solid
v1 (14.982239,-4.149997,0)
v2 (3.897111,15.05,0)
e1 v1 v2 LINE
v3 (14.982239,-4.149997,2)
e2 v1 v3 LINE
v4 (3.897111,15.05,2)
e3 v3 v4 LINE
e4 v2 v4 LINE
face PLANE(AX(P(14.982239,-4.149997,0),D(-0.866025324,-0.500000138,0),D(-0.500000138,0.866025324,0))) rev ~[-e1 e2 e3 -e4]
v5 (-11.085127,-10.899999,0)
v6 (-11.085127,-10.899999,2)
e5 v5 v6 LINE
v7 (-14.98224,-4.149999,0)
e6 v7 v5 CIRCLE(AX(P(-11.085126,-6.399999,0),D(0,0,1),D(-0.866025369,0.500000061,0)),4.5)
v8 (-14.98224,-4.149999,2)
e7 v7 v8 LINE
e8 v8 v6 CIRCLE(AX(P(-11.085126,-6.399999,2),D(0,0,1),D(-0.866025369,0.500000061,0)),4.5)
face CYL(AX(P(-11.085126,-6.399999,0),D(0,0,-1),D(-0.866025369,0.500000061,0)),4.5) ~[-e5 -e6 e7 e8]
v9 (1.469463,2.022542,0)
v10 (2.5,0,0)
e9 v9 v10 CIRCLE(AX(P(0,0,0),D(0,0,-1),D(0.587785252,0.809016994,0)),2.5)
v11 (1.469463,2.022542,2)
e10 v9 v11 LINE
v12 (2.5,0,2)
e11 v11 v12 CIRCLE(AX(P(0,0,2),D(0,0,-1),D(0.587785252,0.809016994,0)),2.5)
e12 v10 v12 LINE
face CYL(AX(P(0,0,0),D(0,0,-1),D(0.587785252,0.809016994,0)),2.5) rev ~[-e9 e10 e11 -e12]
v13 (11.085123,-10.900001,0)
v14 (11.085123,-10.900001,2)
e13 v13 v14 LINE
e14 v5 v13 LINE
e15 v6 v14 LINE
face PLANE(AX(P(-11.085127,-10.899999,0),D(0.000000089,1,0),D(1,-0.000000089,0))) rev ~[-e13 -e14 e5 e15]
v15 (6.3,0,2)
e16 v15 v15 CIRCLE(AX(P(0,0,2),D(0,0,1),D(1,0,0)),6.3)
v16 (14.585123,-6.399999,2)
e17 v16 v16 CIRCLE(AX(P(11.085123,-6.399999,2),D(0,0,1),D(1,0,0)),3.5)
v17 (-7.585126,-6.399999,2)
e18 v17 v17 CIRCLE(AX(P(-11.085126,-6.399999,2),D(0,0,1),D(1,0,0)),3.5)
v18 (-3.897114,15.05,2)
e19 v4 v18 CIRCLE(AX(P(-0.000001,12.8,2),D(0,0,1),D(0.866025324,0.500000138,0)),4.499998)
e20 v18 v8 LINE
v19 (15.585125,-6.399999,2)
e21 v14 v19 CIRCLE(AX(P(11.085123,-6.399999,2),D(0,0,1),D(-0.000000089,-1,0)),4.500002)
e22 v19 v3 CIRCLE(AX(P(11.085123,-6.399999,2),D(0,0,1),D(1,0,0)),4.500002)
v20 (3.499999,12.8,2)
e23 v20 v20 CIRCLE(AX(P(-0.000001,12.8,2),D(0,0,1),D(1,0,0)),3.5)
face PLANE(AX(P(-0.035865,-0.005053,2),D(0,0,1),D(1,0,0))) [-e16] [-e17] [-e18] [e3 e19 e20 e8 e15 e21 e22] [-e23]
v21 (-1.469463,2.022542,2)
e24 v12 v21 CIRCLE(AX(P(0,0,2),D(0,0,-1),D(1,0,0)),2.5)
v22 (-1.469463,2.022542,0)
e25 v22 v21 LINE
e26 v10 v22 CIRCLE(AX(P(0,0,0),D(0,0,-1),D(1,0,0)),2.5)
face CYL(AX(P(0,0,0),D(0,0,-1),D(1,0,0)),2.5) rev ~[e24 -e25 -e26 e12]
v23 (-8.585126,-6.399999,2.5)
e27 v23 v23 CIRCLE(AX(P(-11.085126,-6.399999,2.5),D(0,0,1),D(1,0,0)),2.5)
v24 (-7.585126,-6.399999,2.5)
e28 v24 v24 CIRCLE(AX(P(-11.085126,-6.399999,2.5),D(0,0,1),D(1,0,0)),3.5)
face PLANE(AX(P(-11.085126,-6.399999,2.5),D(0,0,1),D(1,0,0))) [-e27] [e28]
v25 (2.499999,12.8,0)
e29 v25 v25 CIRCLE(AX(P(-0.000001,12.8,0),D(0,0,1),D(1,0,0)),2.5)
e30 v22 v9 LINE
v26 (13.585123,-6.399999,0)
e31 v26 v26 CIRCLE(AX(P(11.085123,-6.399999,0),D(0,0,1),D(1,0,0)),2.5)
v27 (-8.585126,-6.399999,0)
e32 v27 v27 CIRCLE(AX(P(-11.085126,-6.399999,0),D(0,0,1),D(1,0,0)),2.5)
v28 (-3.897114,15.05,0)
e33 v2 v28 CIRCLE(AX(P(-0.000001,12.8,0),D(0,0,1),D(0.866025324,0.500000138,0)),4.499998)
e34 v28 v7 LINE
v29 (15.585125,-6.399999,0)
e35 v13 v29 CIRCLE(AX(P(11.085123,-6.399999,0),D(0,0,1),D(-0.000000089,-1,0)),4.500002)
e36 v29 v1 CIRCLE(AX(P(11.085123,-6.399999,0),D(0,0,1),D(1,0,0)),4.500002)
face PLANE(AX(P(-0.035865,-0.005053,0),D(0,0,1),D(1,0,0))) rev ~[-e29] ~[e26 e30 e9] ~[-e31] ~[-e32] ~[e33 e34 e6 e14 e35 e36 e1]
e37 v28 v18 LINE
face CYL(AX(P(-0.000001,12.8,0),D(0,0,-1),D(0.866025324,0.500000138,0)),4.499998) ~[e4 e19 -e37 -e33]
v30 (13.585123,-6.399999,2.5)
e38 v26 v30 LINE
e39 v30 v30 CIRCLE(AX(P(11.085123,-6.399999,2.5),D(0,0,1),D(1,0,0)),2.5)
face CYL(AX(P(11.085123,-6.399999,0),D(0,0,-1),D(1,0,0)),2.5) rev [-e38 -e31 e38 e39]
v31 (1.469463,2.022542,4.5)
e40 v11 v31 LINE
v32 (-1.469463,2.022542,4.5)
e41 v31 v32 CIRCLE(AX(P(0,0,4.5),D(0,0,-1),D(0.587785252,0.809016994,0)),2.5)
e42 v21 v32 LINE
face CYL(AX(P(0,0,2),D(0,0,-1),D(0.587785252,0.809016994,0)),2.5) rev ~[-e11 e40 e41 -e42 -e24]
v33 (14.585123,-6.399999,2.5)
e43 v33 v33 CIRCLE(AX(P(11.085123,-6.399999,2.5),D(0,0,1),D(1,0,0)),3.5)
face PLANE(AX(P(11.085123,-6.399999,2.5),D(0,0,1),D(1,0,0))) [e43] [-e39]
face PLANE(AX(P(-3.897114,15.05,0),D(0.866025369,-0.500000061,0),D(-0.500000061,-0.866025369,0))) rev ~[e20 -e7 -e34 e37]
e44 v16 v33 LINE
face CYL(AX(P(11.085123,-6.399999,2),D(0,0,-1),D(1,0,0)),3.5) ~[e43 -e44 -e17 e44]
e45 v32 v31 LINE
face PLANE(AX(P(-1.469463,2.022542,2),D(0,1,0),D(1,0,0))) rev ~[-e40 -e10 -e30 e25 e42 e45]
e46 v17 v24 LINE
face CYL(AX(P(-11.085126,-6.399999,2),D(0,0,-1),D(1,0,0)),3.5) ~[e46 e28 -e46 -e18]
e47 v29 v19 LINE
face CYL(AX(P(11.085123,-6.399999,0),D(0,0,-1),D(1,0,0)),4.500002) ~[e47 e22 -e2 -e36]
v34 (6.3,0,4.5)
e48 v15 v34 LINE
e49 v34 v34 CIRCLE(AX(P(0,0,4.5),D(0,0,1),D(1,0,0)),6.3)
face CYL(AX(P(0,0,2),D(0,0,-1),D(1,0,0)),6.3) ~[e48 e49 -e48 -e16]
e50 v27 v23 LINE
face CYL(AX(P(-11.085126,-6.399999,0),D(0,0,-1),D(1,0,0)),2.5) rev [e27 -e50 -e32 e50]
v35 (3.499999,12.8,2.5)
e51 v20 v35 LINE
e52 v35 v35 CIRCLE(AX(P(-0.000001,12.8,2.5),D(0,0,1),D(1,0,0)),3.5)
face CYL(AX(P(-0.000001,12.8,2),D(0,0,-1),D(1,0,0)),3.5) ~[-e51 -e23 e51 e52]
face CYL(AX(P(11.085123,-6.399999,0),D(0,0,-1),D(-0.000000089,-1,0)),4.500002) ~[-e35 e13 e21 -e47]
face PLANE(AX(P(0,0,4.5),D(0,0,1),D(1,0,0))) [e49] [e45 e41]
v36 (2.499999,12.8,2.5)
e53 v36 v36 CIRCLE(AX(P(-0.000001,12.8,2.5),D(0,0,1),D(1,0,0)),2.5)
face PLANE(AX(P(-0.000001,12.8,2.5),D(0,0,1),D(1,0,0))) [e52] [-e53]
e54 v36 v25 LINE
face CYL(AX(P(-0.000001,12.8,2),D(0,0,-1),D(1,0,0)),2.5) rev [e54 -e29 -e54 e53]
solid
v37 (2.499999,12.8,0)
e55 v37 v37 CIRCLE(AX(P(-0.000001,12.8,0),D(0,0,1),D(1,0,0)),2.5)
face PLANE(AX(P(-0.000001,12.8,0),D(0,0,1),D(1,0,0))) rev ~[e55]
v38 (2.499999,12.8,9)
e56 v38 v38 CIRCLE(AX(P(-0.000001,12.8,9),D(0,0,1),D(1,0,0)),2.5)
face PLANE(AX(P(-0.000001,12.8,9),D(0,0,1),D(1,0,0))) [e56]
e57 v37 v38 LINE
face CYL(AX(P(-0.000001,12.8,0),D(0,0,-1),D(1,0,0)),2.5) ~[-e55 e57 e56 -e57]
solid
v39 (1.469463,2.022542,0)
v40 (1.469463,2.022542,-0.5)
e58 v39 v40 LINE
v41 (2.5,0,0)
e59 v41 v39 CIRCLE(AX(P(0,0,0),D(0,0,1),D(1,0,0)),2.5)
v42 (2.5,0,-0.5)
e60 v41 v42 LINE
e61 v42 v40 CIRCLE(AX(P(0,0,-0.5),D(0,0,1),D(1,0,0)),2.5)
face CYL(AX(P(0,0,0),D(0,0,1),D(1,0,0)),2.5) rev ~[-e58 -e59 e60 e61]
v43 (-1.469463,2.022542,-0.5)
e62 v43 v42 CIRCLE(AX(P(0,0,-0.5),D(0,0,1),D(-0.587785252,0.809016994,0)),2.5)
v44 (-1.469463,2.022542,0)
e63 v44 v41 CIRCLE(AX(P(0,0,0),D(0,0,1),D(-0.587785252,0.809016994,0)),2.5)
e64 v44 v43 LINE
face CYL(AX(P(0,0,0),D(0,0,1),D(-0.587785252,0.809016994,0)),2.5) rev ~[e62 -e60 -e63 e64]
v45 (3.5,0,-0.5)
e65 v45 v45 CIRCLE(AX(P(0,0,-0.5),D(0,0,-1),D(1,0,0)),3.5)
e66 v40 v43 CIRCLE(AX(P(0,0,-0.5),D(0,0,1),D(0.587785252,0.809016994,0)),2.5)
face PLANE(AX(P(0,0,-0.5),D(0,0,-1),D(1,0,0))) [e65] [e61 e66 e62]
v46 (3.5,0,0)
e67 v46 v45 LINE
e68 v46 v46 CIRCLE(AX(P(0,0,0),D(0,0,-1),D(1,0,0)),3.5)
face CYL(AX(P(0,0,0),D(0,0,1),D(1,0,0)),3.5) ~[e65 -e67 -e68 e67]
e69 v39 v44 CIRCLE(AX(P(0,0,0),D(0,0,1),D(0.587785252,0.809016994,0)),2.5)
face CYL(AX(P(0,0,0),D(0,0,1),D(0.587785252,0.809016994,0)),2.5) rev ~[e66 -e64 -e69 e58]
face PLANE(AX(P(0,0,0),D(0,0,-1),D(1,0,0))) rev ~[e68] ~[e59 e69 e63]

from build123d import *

# Parameters (mm, degrees)
F0_R     = 6.3000004034
F0_R_2   = 2.5
F1_DEPTH = 2
F2_R     = 6.3000004034
F3_DEPTH = 2.5
F4_R     = 3.5
F5_DEPTH = 0.5
F2_R_2   = 3.5
F2_R_3   = 2.5
F6_DEPTH = 0.5
F7_DEPTH = 9


# Not quite as in the source:
# - a feature names something its author has since deleted; it is built from what else it names


with BuildPart() as f1:
    # F0 (on Top) → F1 (new body)
    with BuildSketch(Plane.XY):
        with BuildLine():
            ThreePointArc((-14.9822403618, -4.1499987392), (-9.9204403472, -2.0533328369), (-6.5851262035, -6.3999990141))
            ThreePointArc((-6.5851262035, -6.3999990141), (-7.9031458296, -9.581979671), (-11.0851266037, -10.8999990141))
            Line((-11.0851266037, -10.8999990141), (11.0851230607, -10.9000009859))
            ThreePointArc((11.0851230607, -10.9000009859), (7.1880073569, -4.1499981658), (14.9822391266, -4.1499974067))
            Line((14.9822391266, -4.1499974067), (3.8971112321, 15.0500002429))
            ThreePointArc((3.8971112321, 15.0500002429), (4.3466632431, 13.9646860482), (4.4999970644, 12.8000004034))
            ThreePointArc((4.4999970644, 12.8000004034), (-1.1646868227, 8.4533357372), (-3.8971141748, 15.0499998963))
            Line((-3.8971141748, 15.0499998963), (-14.9822403618, -4.1499987392))
        make_face()
        Circle(F0_R, mode=Mode.SUBTRACT)
        Circle(F0_R)
        with BuildLine():
            ThreePointArc((1.4694631307, 2.0225424859), (2.2275163105, 1.1349762493), (2.5, 0))
            ThreePointArc((2.5, 0), (-1.1349762493, -2.2275163105), (-1.4694631307, 2.0225424859))
            ThreePointArc((-1.4694631307, 2.0225424859), (0, 2.5), (1.4694631307, 2.0225424859))
        make_face(mode=Mode.SUBTRACT)
        with BuildLine():
            ThreePointArc((14.9822391266, -4.1499974067), (7.1880073569, -4.1499981658), (11.0851230607, -10.9000009859))
            ThreePointArc((11.0851230607, -10.9000009859), (14.2671052289, -9.5819810652), (15.5851254326, -6.3999990141))
            ThreePointArc((15.5851254326, -6.3999990141), (15.4317914908, -5.2353124542), (14.9822391266, -4.1499974067))
        make_face()
        with Locations((11.0851234609, -6.3999990141)):
            Circle(F0_R_2, mode=Mode.SUBTRACT)
        with BuildLine():
            ThreePointArc((-11.0851266037, -10.8999990141), (-7.9031458296, -9.581979671), (-6.5851262035, -6.3999990141))
            ThreePointArc((-6.5851262035, -6.3999990141), (-9.9204403472, -2.0533328369), (-14.9822403618, -4.1499987392))
            ThreePointArc((-14.9822403618, -4.1499987392), (-14.9822406999, -8.6499987034), (-11.0851266037, -10.8999990141))
        make_face()
        with Locations((-11.0851262035, -6.3999990141)):
            Circle(F0_R_2, mode=Mode.SUBTRACT)
        with BuildLine():
            ThreePointArc((3.8971112321, 15.0500002429), (-1.5714e-06, 17.2999988391), (-3.8971141748, 15.0499998963))
            ThreePointArc((-3.8971141748, 15.0499998963), (-1.1646868227, 8.4533357372), (4.4999970644, 12.8000004034))
            ThreePointArc((4.4999970644, 12.8000004034), (4.3466632431, 13.9646860482), (3.8971112321, 15.0500002429))
        make_face()
        with Locations((-1.3713e-06, 12.8000004034)):
            Circle(F0_R_2, mode=Mode.SUBTRACT)
        with BuildLine():
            Line((-1.4694631307, 2.0225424859), (1.4694631307, 2.0225424859))
            ThreePointArc((1.4694631307, 2.0225424859), (0, 2.5), (-1.4694631307, 2.0225424859))
        make_face()
    extrude(amount=F1_DEPTH)

    # F2 (on face) → F3 (join)
    with BuildSketch(Plane.XY.offset(2)):
        Circle(F2_R)
        with BuildLine():
            Line((-1.4694631307, 2.0225424859), (1.4694631307, 2.0225424859))
            ThreePointArc((1.4694631307, 2.0225424859), (0, -2.5), (-1.4694631307, 2.0225424859))
        make_face(mode=Mode.SUBTRACT)
    extrude(amount=F3_DEPTH)

    # F2 (on face) → F6 (join)
    with BuildSketch(Plane.XY.offset(2)):
        with Locations((-1.3713e-06, 12.8000004034)):
            Circle(F2_R_2)
        with Locations((-1.3713e-06, 12.8000004034)):
            Circle(F2_R_3, mode=Mode.SUBTRACT)
        with Locations((-11.0851262035, -6.3999990141)):
            Circle(F2_R_2)
        with Locations((-11.0851262035, -6.3999990141)):
            Circle(F2_R_3, mode=Mode.SUBTRACT)
        with Locations((11.0851234609, -6.3999990141)):
            Circle(F2_R_2)
        with Locations((11.0851234609, -6.3999990141)):
            Circle(F2_R_3, mode=Mode.SUBTRACT)
    extrude(amount=F6_DEPTH)


with BuildPart() as f5:
    # F4 (on face) → F5 (new body)
    with BuildSketch(Plane(origin=(0, 0, 0), x_dir=(1, 0, 0), z_dir=(0, 0, -1))):
        Circle(F4_R)
        with BuildLine():
            ThreePointArc((-1.4694631307, -2.0225424859), (-1.1349762493, 2.2275163105), (2.5, 0))
            ThreePointArc((2.5, 0), (2.2275163105, -1.1349762493), (1.4694631307, -2.0225424859))
            ThreePointArc((1.4694631307, -2.0225424859), (0, -2.5), (-1.4694631307, -2.0225424859))
        make_face(mode=Mode.SUBTRACT)
    extrude(amount=F5_DEPTH)


with BuildPart() as f7:
    # F0 (on Top) → F7 (new body)
    with BuildSketch(Plane.XY):
        with Locations((-1.3713e-06, 12.8000004034)):
            Circle(F0_R_2)
    extrude(amount=F7_DEPTH)


solid = Compound([f1.part, f5.part, f7.part])
